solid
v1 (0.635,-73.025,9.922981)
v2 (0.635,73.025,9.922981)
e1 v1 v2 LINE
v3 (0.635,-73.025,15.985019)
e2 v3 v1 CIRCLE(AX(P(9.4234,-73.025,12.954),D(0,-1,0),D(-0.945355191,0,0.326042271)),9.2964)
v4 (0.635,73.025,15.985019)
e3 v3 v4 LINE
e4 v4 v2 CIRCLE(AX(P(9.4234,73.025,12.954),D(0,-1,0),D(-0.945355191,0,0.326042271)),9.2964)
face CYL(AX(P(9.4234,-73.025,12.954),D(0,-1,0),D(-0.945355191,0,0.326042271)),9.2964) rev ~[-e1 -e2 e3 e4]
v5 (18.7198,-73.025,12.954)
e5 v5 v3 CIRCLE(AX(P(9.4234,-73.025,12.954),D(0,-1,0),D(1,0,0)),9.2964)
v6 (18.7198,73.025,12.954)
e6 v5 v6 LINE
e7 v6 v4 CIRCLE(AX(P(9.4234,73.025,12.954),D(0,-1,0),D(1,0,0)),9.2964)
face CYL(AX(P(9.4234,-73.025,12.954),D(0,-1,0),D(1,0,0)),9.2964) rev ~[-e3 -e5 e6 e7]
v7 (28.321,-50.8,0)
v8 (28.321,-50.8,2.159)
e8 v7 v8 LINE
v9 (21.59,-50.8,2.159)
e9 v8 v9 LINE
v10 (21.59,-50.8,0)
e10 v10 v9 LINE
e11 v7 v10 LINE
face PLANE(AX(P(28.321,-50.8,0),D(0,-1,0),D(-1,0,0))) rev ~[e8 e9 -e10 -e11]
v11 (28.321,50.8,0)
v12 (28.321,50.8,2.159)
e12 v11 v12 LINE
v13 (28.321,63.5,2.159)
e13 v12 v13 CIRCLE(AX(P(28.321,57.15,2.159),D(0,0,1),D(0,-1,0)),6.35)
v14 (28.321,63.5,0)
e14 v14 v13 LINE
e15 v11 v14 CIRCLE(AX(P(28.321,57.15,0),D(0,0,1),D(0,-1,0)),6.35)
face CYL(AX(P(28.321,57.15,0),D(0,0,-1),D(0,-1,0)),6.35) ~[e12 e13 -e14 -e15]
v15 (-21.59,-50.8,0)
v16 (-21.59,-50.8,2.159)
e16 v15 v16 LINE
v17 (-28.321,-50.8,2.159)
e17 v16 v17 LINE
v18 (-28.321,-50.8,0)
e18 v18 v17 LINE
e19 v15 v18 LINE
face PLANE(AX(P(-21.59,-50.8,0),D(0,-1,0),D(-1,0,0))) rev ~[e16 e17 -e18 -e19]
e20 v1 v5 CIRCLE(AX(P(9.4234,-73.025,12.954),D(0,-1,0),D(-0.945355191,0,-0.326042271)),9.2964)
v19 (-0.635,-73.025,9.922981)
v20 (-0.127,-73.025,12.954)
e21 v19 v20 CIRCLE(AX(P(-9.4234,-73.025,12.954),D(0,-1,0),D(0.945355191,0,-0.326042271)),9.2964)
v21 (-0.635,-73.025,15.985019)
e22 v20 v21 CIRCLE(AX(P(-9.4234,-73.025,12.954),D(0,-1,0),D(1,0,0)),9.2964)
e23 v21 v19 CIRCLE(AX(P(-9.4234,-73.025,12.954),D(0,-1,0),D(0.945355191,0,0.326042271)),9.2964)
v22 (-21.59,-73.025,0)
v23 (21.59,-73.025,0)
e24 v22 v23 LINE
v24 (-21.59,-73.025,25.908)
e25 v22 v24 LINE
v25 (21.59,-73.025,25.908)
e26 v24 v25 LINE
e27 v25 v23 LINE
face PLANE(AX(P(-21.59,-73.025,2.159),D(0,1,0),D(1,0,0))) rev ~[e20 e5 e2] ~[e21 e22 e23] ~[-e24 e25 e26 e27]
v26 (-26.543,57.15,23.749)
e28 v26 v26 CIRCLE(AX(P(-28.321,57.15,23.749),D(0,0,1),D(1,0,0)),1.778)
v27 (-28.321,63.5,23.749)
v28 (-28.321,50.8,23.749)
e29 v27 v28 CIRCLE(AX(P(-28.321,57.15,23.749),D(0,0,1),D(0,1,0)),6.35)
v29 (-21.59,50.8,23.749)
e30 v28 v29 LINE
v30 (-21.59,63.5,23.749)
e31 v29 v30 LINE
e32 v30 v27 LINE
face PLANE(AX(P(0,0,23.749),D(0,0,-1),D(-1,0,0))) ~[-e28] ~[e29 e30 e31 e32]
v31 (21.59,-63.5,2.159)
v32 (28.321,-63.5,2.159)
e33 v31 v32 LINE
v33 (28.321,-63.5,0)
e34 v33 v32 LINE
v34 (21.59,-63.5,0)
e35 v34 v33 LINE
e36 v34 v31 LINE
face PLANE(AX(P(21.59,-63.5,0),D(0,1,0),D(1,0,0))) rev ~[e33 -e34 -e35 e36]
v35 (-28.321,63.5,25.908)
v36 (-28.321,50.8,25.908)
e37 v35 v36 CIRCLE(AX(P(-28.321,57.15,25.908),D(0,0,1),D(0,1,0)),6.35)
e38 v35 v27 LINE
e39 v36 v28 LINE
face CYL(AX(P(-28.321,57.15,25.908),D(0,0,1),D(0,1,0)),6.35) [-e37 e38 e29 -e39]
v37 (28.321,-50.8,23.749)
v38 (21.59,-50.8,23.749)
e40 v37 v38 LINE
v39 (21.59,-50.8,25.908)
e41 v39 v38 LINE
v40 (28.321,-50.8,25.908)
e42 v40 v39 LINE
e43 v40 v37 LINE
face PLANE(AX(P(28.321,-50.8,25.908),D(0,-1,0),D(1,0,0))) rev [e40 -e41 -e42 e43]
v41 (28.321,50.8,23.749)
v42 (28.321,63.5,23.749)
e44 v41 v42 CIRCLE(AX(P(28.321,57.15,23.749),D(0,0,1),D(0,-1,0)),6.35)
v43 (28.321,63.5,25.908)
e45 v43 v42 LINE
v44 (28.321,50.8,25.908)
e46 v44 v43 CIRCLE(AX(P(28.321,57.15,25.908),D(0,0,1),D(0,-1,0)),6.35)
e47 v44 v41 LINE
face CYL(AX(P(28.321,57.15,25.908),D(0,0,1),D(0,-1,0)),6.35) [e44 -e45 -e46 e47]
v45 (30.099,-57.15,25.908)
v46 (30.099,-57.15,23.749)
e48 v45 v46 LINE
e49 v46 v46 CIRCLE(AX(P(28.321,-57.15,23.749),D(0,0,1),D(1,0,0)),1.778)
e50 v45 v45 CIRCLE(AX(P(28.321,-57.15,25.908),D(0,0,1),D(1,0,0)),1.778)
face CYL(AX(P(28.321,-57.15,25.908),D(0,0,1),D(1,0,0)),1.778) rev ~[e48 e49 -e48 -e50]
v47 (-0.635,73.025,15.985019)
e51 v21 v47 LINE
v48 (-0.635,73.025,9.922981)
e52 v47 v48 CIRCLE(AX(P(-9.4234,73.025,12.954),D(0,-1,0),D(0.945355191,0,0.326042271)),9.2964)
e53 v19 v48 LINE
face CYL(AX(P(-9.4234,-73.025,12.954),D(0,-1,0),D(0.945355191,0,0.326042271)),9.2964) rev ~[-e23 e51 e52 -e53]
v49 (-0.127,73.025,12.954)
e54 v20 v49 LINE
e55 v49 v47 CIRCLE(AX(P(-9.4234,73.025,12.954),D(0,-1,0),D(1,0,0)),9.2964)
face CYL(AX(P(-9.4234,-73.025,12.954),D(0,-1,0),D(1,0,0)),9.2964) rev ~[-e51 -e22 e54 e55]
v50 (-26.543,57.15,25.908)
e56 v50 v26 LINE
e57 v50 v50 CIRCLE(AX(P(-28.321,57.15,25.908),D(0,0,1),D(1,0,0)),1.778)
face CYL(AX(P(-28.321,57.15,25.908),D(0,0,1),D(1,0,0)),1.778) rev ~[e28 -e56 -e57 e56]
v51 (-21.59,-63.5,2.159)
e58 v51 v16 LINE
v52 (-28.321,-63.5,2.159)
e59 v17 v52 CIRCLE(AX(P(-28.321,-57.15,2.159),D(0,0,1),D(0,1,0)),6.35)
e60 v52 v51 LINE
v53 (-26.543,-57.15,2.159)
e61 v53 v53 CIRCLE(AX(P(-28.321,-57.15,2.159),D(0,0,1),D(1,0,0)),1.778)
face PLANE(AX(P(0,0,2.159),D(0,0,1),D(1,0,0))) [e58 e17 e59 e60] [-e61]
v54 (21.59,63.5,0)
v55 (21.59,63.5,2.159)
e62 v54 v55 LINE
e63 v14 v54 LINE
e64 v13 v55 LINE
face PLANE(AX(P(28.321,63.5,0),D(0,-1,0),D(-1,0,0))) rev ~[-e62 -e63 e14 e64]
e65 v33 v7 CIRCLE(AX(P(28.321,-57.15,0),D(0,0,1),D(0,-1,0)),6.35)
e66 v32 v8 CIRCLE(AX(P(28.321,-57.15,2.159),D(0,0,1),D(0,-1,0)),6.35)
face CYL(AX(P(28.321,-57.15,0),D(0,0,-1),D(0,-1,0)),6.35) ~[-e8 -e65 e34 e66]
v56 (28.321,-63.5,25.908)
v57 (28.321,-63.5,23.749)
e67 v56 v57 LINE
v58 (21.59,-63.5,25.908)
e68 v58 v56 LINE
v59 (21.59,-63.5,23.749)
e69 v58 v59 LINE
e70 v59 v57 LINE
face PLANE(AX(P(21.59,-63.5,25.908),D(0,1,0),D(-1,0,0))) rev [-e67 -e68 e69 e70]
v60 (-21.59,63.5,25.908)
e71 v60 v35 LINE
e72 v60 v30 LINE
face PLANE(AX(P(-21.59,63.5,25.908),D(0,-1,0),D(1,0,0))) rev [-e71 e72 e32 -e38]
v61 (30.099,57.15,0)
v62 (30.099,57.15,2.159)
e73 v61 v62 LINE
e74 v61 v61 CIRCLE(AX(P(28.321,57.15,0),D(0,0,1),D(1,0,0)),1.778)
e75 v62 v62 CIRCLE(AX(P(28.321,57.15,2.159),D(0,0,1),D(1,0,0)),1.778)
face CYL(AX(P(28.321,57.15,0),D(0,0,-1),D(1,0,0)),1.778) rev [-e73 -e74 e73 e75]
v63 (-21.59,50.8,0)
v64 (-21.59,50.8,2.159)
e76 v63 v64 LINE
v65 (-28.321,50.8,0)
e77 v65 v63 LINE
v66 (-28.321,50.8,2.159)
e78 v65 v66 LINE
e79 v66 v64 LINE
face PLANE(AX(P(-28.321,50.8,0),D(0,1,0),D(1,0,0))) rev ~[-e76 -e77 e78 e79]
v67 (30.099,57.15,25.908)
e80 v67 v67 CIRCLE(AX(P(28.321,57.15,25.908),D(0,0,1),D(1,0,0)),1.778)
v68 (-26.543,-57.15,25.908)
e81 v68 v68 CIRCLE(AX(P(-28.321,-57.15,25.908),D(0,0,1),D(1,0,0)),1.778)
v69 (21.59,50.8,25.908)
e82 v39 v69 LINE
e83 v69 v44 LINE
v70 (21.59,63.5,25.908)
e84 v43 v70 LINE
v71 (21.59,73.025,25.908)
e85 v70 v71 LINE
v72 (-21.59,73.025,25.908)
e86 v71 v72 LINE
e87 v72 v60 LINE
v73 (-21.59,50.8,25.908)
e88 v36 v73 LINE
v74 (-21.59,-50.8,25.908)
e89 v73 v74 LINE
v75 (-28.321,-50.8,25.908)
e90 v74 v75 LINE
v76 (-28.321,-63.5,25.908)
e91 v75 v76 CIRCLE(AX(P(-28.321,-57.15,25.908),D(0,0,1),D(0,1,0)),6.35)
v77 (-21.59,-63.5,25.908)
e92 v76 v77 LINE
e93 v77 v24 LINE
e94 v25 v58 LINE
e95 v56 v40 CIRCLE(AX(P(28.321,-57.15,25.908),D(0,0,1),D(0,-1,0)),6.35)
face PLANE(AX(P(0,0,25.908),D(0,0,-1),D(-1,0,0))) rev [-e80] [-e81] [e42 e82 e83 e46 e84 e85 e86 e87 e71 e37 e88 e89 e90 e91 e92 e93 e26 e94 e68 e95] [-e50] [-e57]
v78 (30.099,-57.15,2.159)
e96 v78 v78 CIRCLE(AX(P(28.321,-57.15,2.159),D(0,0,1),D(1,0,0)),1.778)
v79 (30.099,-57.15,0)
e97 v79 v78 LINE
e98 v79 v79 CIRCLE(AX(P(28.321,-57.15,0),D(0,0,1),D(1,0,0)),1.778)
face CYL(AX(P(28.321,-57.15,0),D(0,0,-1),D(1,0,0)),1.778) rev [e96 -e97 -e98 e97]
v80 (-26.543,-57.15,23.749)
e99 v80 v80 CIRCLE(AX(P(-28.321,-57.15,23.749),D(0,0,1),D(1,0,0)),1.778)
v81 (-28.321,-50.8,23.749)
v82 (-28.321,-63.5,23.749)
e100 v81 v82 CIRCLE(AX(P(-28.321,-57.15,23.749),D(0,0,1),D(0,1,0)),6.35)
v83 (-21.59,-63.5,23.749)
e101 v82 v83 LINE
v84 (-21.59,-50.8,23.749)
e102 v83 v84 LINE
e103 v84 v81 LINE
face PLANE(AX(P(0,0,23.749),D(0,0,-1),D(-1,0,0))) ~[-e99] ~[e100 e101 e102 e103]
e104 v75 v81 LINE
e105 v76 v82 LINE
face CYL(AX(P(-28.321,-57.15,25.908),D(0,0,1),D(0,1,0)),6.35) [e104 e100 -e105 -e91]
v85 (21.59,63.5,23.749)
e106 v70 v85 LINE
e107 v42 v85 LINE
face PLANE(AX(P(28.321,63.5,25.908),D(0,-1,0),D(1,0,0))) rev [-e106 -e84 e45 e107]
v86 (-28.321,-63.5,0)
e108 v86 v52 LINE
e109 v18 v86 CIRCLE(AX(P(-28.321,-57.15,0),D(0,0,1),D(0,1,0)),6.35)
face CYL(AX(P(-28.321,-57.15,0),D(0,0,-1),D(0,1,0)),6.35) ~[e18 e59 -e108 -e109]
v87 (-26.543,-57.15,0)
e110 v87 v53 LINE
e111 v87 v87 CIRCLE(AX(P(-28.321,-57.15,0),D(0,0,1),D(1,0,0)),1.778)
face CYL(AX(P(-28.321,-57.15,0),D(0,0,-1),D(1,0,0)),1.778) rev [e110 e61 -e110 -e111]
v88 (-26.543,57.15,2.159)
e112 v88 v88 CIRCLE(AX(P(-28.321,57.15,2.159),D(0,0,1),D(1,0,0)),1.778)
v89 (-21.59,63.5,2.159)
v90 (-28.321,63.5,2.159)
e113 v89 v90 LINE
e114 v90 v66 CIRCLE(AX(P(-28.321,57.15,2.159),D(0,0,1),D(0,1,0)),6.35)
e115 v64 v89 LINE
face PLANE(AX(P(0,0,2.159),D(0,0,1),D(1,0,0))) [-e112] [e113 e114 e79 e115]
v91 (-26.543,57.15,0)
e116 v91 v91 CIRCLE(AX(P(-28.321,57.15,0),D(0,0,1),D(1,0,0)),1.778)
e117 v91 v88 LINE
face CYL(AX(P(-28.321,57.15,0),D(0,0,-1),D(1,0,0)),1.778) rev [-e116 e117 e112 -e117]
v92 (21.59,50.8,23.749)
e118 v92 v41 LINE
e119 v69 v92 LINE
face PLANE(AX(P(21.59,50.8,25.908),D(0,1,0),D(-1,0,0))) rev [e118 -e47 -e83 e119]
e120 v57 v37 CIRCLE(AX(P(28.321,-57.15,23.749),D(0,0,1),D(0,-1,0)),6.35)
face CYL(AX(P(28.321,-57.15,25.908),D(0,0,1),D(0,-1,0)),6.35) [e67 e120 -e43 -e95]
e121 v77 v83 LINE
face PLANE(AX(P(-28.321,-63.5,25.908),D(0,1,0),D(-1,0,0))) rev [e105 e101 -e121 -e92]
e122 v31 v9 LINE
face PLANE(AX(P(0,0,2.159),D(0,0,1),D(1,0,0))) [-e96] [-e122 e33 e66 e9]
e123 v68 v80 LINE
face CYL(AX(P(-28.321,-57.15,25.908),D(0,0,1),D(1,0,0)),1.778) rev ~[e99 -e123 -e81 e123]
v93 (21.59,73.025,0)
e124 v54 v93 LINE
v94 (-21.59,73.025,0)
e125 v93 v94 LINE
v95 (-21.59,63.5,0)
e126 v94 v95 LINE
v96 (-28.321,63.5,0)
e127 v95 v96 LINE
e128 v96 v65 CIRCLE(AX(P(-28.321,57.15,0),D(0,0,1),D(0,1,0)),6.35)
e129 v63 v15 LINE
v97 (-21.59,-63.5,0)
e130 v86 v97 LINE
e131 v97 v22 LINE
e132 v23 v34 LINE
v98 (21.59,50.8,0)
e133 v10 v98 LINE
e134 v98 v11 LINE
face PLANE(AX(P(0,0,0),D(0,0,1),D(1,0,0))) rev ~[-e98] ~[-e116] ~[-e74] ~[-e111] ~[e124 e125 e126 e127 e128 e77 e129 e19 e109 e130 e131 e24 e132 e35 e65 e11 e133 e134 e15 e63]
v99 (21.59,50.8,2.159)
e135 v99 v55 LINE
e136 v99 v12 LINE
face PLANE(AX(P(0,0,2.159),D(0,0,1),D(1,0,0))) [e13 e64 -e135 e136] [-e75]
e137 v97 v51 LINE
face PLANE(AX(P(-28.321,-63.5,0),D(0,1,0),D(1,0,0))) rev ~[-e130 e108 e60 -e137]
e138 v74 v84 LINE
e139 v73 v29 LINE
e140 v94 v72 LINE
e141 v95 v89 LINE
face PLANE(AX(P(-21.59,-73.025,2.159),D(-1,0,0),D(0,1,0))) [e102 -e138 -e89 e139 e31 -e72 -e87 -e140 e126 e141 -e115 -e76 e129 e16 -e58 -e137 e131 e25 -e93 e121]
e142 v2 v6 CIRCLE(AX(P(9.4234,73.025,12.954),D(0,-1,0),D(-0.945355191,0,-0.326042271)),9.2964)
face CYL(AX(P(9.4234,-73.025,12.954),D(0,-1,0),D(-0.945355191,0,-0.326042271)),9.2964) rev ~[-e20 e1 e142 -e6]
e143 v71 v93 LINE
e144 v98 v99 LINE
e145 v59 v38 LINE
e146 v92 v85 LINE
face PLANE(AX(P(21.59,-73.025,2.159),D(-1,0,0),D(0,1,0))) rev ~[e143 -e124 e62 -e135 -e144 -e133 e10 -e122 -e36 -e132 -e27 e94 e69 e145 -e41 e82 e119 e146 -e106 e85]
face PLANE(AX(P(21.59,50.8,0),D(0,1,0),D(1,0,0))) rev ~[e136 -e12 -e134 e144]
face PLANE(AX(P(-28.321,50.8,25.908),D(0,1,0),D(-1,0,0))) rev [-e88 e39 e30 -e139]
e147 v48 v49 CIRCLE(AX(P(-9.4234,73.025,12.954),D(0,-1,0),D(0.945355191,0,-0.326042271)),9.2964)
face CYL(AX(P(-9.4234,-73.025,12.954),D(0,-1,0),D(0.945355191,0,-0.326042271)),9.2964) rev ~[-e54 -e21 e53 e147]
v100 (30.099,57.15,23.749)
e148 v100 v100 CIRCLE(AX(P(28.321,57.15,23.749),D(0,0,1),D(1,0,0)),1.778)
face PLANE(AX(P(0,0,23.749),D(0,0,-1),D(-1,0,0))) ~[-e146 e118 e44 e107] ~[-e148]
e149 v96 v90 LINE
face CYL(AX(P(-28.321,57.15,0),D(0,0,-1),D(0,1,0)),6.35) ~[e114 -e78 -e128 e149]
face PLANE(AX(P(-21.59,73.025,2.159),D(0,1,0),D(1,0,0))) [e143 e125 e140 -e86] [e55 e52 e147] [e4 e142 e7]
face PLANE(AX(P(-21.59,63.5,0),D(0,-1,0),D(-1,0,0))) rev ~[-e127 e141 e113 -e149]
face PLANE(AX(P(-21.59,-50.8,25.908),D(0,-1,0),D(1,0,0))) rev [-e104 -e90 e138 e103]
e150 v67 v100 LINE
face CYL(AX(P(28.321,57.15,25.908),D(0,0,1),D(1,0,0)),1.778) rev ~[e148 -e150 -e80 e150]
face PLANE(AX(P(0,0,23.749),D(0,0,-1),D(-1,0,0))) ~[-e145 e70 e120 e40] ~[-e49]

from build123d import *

# Parameters (mm, degrees)
F0_R     = 1.778
F1_DEPTH = 2.159
F2_W     = 43.18
F2_H     = 146.05
F3_DEPTH = 21.59
F4_R     = 1.778
F5_DEPTH = 2.159
F7_DEPTH = 146.051


# Not quite as in the source:
# - a pattern or mirror of a feature is missing from the dataset's text; its kind, count and spacing are read off the source's solid


with BuildPart() as f1:
    # F0 (on Top) → F1 (new body)
    with BuildSketch(Plane.XY):
        Polygon((21.59, 63.5), (21.59, 73.025), (-21.59, 73.025), (-21.59, 63.5), (-21.59, 50.8), (-21.59, -50.8), (-21.59, -63.5), (-21.59, -73.025), (21.59, -73.025), (21.59, -63.5), (21.59, -50.8), (21.59, 50.8), align=None)
        with BuildLine():
            Line((28.321, 63.5), (21.59, 63.5))
            Line((21.59, 63.5), (21.59, 50.8))
            Line((21.59, 50.8), (28.321, 50.8))
            ThreePointArc((28.321, 50.8), (34.671, 57.15), (28.321, 63.5))
        make_face()
        with Locations((28.321, 57.15)):
            Circle(F0_R, mode=Mode.SUBTRACT)
        with BuildLine():
            Line((-21.59, 50.8), (-21.59, 63.5))
            Line((-21.59, 63.5), (-28.321, 63.5))
            ThreePointArc((-28.321, 63.5), (-34.671, 57.15), (-28.321, 50.8))
            Line((-28.321, 50.8), (-21.59, 50.8))
        make_face()
        with Locations((-28.321, 57.15)):
            Circle(F0_R, mode=Mode.SUBTRACT)
        with BuildLine():
            Line((28.321, -50.8), (21.59, -50.8))
            Line((21.59, -50.8), (21.59, -63.5))
            Line((21.59, -63.5), (28.321, -63.5))
            ThreePointArc((28.321, -63.5), (34.671, -57.15), (28.321, -50.8))
        make_face()
        with Locations((28.321, -57.15)):
            Circle(F0_R, mode=Mode.SUBTRACT)
        with BuildLine():
            Line((-21.59, -63.5), (-21.59, -50.8))
            Line((-21.59, -50.8), (-28.321, -50.8))
            ThreePointArc((-28.321, -50.8), (-34.671, -57.15), (-28.321, -63.5))
            Line((-28.321, -63.5), (-21.59, -63.5))
        make_face()
        with Locations((-28.321, -57.15)):
            Circle(F0_R, mode=Mode.SUBTRACT)
    extrude(amount=F1_DEPTH)


with BuildPart() as f1_copies_1:
    # F1_copies: instance of F1
    add(f1.part.mirror(Plane.XY.offset(12.954)))


with BuildPart() as f1_1:
    add(f1.part)

    add(f1_copies_1.part)  # F3 merges F1_copies_1
    # F2 (on face) → F3 (join)
    with BuildSketch(Plane.XY.offset(2.159)):
        Rectangle(F2_W, F2_H)
    extrude(amount=F3_DEPTH)

    # F4 (on face) → F5 (join)
    with BuildSketch(Plane.XY):
        Polygon((21.59, 63.5), (21.59, 73.025), (-21.59, 73.025), (-21.59, 63.5), (-21.59, 50.8), (-21.59, -50.8), (-21.59, -63.5), (-21.59, -73.025), (21.59, -73.025), (21.59, -63.5), (21.59, -50.8), (21.59, 50.8), align=None)
        with BuildLine():
            Line((28.321, 63.5), (21.59, 63.5))
            Line((21.59, 63.5), (21.59, 50.8))
            Line((21.59, 50.8), (28.321, 50.8))
            ThreePointArc((28.321, 50.8), (34.671, 57.15), (28.321, 63.5))
        make_face()
        with Locations((28.321, 57.15)):
            Circle(F4_R, mode=Mode.SUBTRACT)
        with BuildLine():
            Line((-21.59, 50.8), (-21.59, 63.5))
            Line((-21.59, 63.5), (-28.321, 63.5))
            ThreePointArc((-28.321, 63.5), (-34.671, 57.15), (-28.321, 50.8))
            Line((-28.321, 50.8), (-21.59, 50.8))
        make_face()
        with Locations((-28.321, 57.15)):
            Circle(F4_R, mode=Mode.SUBTRACT)
        with BuildLine():
            Line((28.321, -50.8), (21.59, -50.8))
            Line((21.59, -50.8), (21.59, -63.5))
            Line((21.59, -63.5), (28.321, -63.5))
            ThreePointArc((28.321, -63.5), (34.671, -57.15), (28.321, -50.8))
        make_face()
        with Locations((28.321, -57.15)):
            Circle(F4_R, mode=Mode.SUBTRACT)
        with BuildLine():
            Line((-21.59, -63.5), (-21.59, -50.8))
            Line((-21.59, -50.8), (-28.321, -50.8))
            ThreePointArc((-28.321, -50.8), (-34.671, -57.15), (-28.321, -63.5))
            Line((-28.321, -63.5), (-21.59, -63.5))
        make_face()
        with Locations((-28.321, -57.15)):
            Circle(F4_R, mode=Mode.SUBTRACT)
    extrude(amount=F5_DEPTH)

    # F6 (on face) → F7 (cut, through all)
    with BuildSketch(Plane.XZ.offset(73.025)):
        with BuildLine():
            Line((-0.635, 9.9229806335), (-0.635, 15.9850193665))
            ThreePointArc((-0.635, 15.9850193665), (-18.7198, 12.954), (-0.635, 9.9229806335))
        make_face()
        with BuildLine():
            ThreePointArc((-0.635, 9.9229806335), (-0.2548795436, 11.4173524802), (-0.127, 12.954))
            ThreePointArc((-0.127, 12.954), (-0.2548795436, 14.4906475198), (-0.635, 15.9850193665))
            Line((-0.635, 15.9850193665), (-0.635, 9.9229806335))
        make_face()
        with BuildLine():
            Line((0.635, 9.9229806335), (0.635, 15.9850193665))
            ThreePointArc((0.635, 15.9850193665), (0.127, 12.954), (0.635, 9.9229806335))
        make_face()
        with BuildLine():
            ThreePointArc((18.7198, 12.954), (10.9600475198, 22.1225204564), (0.635, 15.9850193665))
            Line((0.635, 15.9850193665), (0.635, 9.9229806335))
            ThreePointArc((0.635, 9.9229806335), (10.9600475198, 3.7854795436), (18.7198, 12.954))
        make_face()
    extrude(amount=-F7_DEPTH, mode=Mode.SUBTRACT)


solid = f1_1.part
